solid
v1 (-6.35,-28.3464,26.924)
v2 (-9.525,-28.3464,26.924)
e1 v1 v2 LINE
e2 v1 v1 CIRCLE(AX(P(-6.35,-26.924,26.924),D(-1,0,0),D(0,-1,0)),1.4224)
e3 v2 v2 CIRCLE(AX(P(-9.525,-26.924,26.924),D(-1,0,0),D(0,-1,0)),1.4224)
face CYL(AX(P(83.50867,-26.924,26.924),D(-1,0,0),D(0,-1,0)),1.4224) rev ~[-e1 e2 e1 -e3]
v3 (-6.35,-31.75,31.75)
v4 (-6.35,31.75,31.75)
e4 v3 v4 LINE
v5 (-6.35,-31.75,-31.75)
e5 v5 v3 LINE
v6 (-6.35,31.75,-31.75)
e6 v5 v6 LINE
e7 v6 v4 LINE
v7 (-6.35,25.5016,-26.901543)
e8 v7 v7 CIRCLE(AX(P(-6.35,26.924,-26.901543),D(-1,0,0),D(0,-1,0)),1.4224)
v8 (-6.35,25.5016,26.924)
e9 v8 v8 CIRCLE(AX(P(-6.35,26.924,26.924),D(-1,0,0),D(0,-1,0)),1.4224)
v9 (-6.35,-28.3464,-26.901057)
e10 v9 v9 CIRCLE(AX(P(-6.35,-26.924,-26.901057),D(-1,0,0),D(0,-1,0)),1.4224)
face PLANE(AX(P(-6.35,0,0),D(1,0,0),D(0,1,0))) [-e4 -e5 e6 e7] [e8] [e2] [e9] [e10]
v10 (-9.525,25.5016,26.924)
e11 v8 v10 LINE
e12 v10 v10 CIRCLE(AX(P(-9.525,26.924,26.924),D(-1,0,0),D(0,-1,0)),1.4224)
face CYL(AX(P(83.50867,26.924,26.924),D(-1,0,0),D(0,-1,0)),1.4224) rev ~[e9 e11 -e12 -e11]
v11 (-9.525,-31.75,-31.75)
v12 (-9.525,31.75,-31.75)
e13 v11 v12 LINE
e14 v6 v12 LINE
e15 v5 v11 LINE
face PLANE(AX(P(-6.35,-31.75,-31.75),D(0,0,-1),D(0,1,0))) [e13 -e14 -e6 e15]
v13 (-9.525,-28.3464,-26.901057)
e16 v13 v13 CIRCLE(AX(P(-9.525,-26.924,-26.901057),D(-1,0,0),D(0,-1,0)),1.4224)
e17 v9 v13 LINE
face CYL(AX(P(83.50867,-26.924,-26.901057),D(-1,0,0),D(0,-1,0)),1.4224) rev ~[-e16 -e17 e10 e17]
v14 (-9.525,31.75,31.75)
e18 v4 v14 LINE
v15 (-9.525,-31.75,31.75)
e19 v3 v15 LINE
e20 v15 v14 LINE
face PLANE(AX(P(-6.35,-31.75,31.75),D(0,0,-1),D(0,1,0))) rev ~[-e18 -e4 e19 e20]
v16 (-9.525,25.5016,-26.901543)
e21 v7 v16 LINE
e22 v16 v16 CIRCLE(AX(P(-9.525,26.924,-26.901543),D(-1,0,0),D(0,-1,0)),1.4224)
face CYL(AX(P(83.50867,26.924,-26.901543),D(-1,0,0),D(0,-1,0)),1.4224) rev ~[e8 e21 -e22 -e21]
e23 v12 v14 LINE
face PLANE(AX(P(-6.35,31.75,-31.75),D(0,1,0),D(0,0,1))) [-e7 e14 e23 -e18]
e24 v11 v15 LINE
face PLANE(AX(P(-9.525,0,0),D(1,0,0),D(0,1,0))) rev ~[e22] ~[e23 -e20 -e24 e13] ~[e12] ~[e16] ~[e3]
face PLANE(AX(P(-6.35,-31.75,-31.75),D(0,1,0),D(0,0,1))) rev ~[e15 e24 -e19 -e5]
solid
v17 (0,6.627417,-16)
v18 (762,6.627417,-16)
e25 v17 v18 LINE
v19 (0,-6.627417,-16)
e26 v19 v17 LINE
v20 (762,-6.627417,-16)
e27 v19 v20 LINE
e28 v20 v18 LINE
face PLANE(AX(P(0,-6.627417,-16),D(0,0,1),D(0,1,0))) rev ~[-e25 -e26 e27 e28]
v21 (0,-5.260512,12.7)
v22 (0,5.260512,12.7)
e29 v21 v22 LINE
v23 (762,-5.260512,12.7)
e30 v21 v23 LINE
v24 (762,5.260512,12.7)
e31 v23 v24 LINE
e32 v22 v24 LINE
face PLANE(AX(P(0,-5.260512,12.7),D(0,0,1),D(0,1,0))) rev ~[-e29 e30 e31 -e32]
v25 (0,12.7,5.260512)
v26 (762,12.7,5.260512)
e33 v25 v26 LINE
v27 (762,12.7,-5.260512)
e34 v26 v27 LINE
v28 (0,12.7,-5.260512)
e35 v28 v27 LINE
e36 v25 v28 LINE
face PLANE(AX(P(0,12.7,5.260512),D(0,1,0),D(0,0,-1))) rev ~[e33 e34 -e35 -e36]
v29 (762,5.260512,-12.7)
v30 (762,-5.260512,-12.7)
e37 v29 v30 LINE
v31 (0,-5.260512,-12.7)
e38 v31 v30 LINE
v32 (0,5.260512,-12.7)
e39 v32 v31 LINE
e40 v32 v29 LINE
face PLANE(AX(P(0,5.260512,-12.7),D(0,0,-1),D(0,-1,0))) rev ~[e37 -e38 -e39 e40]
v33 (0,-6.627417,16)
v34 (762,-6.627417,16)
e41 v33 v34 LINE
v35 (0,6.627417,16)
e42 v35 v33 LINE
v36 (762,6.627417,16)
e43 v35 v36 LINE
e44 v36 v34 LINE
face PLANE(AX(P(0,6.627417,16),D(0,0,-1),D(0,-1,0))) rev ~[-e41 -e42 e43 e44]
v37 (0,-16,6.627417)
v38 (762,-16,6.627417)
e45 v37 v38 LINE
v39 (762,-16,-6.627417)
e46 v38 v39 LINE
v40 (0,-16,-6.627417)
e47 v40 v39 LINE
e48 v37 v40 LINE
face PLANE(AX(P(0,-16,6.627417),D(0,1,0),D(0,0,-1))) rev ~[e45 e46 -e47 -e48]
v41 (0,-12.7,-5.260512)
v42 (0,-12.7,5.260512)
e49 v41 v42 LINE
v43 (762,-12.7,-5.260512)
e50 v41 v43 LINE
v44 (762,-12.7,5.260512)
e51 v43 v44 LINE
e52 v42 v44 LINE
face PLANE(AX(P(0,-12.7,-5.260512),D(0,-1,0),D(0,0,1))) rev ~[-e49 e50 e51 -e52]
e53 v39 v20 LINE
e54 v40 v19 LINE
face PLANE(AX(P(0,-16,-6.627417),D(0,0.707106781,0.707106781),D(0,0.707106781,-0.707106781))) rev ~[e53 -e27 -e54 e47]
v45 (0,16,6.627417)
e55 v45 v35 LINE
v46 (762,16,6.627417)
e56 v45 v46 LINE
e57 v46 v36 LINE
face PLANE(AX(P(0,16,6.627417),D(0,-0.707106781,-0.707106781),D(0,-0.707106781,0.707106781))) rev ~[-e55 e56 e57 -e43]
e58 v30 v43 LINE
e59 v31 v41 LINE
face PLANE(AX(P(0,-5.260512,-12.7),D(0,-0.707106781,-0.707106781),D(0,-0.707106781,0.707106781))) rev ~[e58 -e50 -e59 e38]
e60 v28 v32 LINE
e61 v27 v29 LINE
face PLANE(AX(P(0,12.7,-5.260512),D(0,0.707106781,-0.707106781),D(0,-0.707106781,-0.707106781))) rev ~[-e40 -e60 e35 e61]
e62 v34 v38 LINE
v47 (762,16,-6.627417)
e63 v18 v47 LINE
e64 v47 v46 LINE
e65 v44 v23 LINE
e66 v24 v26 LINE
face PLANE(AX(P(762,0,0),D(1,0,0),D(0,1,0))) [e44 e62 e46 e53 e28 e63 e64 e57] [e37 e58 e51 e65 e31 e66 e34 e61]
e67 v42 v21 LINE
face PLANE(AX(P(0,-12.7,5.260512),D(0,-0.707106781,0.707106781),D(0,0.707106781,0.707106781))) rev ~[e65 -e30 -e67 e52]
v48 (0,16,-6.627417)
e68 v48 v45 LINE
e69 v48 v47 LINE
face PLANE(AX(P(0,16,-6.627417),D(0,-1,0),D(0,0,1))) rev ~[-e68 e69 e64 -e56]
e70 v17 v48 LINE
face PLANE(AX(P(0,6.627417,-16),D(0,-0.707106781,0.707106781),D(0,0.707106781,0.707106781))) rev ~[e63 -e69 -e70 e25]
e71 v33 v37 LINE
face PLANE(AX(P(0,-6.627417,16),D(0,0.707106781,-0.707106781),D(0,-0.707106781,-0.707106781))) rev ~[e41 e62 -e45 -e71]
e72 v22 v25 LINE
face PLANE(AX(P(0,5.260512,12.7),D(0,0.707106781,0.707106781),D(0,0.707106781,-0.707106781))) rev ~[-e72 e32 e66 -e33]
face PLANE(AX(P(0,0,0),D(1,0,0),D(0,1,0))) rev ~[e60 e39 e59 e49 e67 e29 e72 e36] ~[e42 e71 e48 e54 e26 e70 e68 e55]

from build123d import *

# Parameters (mm, degrees)
F1_DEPTH = 762
F7_W     = 63.5
F7_H     = 63.5
F8_DEPTH = 3.175
F10_D    = 2.8448


# Not quite as in the source:
# - the program builds the solid bodies; features that only make, move or delete a surface that nothing else refers to are left out


with BuildPart() as f1:
    # F0 (on Right) → F1 (new body)
    with BuildSketch(Plane.YZ):
        Polygon((6.627416998, 16), (-6.627416998, 16), (-16, 6.627416998), (-16, -6.627416998), (-6.627416998, -16), (6.627416998, -16), (16, -6.627416998), (16, 6.627416998), align=None)
        Polygon((-12.7, 5.2605122421), (-5.2605122421, 12.7), (5.2605122421, 12.7), (12.7, 5.2605122421), (12.7, -5.2605122421), (5.2605122421, -12.7), (-5.2605122421, -12.7), (-12.7, -5.2605122421), align=None, mode=Mode.SUBTRACT)
    extrude(amount=F1_DEPTH)


with BuildPart() as f8:
    # F7 (on offset) → F8 (new body)
    with BuildSketch(Plane.YZ.offset(-6.35)):
        Rectangle(F7_W, F7_H)
    extrude(amount=-F8_DEPTH)

    # F10 (through all)
    with Locations(Plane.YZ.offset(-6.35)):
        with Locations((-26.924, 26.924), (26.924, 26.924), (26.924, -26.9015428433), (-26.924, -26.9010574487)):
            Hole(F10_D / 2)


solid = Compound([f1.part, f8.part])
